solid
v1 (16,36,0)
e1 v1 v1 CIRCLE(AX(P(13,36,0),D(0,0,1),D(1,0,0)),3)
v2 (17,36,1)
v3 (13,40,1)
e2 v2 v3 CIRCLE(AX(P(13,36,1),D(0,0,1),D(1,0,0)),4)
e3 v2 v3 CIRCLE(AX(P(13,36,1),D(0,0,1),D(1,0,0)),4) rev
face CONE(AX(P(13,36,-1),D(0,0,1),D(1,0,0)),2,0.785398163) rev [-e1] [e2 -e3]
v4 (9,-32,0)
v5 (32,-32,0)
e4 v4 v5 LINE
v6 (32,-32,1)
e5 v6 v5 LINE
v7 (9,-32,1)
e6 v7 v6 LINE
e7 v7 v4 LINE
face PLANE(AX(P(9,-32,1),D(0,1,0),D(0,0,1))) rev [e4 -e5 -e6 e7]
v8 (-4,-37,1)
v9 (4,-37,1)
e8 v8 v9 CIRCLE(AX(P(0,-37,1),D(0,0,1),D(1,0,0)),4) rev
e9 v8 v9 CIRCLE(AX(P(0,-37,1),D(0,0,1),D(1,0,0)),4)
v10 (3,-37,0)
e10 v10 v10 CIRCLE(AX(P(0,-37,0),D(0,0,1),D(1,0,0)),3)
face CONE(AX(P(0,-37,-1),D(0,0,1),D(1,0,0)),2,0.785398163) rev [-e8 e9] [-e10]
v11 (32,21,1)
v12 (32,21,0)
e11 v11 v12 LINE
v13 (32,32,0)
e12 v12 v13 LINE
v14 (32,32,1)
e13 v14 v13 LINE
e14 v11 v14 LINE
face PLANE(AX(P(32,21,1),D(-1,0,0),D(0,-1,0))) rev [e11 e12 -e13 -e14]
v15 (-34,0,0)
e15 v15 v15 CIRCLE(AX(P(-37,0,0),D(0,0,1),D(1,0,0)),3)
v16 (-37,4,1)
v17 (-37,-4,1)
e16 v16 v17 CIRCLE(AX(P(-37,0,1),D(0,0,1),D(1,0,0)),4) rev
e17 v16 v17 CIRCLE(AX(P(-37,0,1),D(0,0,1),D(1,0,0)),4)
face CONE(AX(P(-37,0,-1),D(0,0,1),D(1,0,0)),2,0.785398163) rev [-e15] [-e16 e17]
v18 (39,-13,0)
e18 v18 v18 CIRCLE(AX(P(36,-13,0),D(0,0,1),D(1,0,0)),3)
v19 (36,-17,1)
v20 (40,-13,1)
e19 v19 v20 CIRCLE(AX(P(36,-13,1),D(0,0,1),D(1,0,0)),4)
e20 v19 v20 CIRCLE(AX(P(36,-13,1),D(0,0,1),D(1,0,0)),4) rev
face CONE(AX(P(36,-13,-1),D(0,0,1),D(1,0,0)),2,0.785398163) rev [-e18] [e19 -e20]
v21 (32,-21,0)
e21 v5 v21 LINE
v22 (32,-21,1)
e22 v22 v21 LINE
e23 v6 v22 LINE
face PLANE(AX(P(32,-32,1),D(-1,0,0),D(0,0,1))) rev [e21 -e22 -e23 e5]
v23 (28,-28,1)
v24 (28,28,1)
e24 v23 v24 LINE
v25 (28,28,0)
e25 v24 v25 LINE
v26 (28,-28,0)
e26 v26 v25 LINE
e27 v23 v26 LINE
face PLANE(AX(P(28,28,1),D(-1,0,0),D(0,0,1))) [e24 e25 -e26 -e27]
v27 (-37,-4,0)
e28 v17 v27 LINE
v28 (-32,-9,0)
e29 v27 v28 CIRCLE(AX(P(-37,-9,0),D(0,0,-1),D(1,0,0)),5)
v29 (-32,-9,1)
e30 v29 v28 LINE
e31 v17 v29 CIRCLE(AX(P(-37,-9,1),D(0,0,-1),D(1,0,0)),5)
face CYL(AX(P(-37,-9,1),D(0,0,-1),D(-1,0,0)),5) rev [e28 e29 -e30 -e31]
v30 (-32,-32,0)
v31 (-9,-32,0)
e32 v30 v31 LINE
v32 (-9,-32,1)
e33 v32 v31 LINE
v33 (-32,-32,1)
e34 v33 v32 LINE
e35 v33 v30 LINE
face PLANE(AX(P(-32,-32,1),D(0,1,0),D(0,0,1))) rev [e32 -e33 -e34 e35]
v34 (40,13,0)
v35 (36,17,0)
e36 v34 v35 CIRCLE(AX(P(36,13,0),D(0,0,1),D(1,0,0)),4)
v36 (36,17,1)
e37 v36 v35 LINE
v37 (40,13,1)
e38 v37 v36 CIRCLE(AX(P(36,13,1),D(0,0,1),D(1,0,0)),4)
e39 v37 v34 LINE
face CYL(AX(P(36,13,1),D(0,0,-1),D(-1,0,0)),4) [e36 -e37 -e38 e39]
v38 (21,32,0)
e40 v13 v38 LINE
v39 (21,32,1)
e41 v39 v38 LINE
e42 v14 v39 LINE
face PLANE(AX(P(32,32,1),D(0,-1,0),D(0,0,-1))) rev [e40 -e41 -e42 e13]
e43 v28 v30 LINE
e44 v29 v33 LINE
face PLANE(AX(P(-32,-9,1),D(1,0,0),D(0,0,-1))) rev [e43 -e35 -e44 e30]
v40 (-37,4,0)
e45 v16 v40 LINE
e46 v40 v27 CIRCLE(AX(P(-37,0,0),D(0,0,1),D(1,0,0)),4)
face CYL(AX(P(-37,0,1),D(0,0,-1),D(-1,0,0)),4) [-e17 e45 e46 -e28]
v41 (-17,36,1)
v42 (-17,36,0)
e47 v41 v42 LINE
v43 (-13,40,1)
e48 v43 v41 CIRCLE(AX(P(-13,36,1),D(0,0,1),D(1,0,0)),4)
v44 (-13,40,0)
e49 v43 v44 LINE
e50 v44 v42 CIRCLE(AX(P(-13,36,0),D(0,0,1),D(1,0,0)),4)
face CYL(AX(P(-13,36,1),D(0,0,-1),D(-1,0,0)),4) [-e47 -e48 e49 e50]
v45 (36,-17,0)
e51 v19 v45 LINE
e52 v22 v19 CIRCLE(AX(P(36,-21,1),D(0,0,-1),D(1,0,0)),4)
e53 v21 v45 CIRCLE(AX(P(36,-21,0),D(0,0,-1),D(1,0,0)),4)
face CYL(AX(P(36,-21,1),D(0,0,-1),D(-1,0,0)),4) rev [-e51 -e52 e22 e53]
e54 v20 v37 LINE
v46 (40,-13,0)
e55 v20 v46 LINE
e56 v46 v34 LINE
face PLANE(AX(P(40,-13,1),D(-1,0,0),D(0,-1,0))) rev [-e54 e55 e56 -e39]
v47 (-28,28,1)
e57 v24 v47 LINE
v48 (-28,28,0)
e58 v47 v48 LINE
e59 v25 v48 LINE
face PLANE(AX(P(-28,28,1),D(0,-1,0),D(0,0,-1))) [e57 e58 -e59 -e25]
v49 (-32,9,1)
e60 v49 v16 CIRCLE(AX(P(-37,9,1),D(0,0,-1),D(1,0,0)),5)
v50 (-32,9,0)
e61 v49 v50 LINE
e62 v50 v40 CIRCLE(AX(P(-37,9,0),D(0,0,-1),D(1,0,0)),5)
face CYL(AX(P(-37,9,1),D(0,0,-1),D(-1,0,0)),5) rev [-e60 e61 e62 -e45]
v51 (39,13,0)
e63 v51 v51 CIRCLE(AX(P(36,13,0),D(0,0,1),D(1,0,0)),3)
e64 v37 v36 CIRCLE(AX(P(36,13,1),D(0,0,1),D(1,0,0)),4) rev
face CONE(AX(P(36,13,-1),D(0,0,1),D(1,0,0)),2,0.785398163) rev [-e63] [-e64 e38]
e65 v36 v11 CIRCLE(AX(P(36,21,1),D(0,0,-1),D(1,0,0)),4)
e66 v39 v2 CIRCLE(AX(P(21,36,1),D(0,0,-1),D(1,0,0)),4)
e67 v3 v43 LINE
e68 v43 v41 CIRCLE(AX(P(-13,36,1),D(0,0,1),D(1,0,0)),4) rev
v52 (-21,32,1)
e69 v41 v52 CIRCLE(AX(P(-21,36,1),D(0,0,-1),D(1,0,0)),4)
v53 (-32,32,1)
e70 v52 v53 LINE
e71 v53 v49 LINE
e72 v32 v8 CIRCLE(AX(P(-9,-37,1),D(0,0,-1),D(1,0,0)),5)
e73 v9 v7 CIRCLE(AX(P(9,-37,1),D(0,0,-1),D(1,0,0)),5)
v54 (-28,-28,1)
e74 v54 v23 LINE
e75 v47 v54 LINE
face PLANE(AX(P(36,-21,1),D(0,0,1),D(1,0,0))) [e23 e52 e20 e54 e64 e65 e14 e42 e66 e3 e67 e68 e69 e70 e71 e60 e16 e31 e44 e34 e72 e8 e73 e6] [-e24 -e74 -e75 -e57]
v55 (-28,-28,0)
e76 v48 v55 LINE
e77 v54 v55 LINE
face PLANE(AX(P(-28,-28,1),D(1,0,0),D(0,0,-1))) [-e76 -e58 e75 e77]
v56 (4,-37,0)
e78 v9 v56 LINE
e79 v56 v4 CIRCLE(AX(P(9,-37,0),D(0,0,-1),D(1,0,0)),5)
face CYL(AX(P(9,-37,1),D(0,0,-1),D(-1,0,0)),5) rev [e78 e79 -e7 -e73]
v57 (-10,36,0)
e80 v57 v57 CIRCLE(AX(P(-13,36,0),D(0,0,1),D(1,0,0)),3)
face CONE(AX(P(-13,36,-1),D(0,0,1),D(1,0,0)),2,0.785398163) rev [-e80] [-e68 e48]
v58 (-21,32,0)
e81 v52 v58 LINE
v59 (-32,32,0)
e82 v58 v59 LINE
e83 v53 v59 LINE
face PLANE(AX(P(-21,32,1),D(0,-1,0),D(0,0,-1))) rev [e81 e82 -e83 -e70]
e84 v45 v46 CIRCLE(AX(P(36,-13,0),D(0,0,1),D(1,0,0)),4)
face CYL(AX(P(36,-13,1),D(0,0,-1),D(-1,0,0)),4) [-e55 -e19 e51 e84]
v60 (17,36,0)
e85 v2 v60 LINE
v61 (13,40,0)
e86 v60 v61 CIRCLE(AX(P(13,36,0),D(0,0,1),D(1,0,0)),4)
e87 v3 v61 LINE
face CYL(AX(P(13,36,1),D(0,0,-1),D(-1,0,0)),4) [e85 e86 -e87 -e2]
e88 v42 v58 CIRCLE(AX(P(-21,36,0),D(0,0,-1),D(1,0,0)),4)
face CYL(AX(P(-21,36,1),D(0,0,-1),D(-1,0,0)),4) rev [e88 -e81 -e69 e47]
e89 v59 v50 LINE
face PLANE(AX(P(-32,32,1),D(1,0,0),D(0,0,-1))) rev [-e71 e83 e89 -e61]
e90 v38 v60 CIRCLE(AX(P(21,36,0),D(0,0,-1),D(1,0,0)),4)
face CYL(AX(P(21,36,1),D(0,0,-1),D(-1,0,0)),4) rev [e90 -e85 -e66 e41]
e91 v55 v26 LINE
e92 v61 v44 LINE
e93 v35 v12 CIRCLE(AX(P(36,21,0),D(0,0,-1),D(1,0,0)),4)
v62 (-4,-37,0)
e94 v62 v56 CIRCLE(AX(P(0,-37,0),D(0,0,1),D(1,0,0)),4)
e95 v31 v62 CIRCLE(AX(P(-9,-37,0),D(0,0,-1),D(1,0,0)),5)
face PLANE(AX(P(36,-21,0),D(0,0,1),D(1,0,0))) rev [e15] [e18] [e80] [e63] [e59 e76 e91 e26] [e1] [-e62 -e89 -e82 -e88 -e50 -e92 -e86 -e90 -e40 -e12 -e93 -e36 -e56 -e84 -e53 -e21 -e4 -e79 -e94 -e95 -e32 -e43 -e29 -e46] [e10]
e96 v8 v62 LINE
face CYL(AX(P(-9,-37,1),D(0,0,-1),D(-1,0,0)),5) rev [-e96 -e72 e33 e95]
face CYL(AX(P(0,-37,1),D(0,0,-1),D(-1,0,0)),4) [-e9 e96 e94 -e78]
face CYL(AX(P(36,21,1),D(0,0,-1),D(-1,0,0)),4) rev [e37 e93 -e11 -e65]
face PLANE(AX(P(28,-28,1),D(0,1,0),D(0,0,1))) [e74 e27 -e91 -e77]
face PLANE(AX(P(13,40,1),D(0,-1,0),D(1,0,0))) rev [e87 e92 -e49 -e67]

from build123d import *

# Parameters (mm, degrees)
SKETCH1_R           = 2
SKETCH1_W           = 56
SKETCH1_H           = 56
BOSS_EXTRUDE1_DEPTH = 1
CHAMFER1_SIZE       = 2


with BuildPart() as part:
    # Sketch1 → Boss-Extrude1 (new body)
    with BuildSketch(Plane.XY):
        with BuildLine():
            Line((40, -13), (40, 13))
            ThreePointArc((40, 13), (38.828427125, 15.828427125), (36, 17))
            ThreePointArc((36, 17), (33.171572875, 18.171572875), (32, 21))
            Line((32, 21), (32, 32))
            Line((32, 32), (21, 32))
            ThreePointArc((21, 32), (18.171572875, 33.171572875), (17, 36))
            ThreePointArc((17, 36), (15.828427125, 38.828427125), (13, 40))
            Line((13, 40), (-13, 40))
            ThreePointArc((-13, 40), (-15.828427125, 38.828427125), (-17, 36))
            ThreePointArc((-17, 36), (-18.171572875, 33.171572875), (-21, 32))
            Line((-21, 32), (-32, 32))
            Line((-32, 32), (-32, 9))
            ThreePointArc((-32, 9), (-33.464466094, 5.464466094), (-37, 4))
            ThreePointArc((-37, 4), (-41, 0), (-37, -4))
            ThreePointArc((-37, -4), (-33.464466094, -5.464466094), (-32, -9))
            Line((-32, -9), (-32, -32))
            Line((-32, -32), (-9, -32))
            ThreePointArc((-9, -32), (-5.464466094, -33.464466094), (-4, -37))
            ThreePointArc((-4, -37), (0, -41), (4, -37))
            ThreePointArc((4, -37), (5.464466094, -33.464466094), (9, -32))
            Line((9, -32), (32, -32))
            Line((32, -32), (32, -21))
            ThreePointArc((32, -21), (33.171572875, -18.171572875), (36, -17))
            ThreePointArc((36, -17), (38.828427125, -15.828427125), (40, -13))
        make_face()
        with Locations((-37, 0)):
            Circle(SKETCH1_R, mode=Mode.SUBTRACT)
        with Locations((-13, 36)):
            Circle(SKETCH1_R, mode=Mode.SUBTRACT)
        with Locations((0, -37)):
            Circle(SKETCH1_R, mode=Mode.SUBTRACT)
        with Locations((36, -13)):
            Circle(SKETCH1_R, mode=Mode.SUBTRACT)
        with Locations((36, 13)):
            Circle(SKETCH1_R, mode=Mode.SUBTRACT)
        with Locations((13, 36)):
            Circle(SKETCH1_R, mode=Mode.SUBTRACT)
        Rectangle(SKETCH1_W, SKETCH1_H, mode=Mode.SUBTRACT)
    extrude(amount=BOSS_EXTRUDE1_DEPTH)

    # Chamfer1
    # the kernel refuses this chamfer: 2 mm, written as the material it takes off along each edge
    with BuildSketch(Plane(origin=(13, 36, 1), x_dir=(1, 0, 0), z_dir=(0, -1, 0))) as chamfer1_piece_1:
        Polygon((2, -CHAMFER1_SIZE), (2 + CHAMFER1_SIZE, 0), (2, 0), align=None)
    revolve(axis=Axis((13, 36, 1), (0, 0, 1)), mode=Mode.SUBTRACT)
    with BuildSketch(Plane(origin=(-13, 36, 1), x_dir=(1, 0, 0), z_dir=(0, -1, 0))) as chamfer1_piece_2:
        Polygon((2, -CHAMFER1_SIZE), (2 + CHAMFER1_SIZE, 0), (2, 0), align=None)
    revolve(axis=Axis((-13, 36, 1), (0, 0, 1)), mode=Mode.SUBTRACT)
    with BuildSketch(Plane(origin=(-37, 0, 1), x_dir=(1, 0, 0), z_dir=(0, -1, 0))) as chamfer1_piece_3:
        Polygon((2, -CHAMFER1_SIZE), (2 + CHAMFER1_SIZE, 0), (2, 0), align=None)
    revolve(axis=Axis((-37, 0, 1), (0, 0, 1)), mode=Mode.SUBTRACT)
    with BuildSketch(Plane(origin=(36, -13, 1), x_dir=(1, 0, 0), z_dir=(0, -1, 0))) as chamfer1_piece_4:
        Polygon((2, -CHAMFER1_SIZE), (2 + CHAMFER1_SIZE, 0), (2, 0), align=None)
    revolve(axis=Axis((36, -13, 1), (0, 0, 1)), mode=Mode.SUBTRACT)
    with BuildSketch(Plane(origin=(0, -37, 1), x_dir=(1, 0, 0), z_dir=(0, -1, 0))) as chamfer1_piece_5:
        Polygon((2, -CHAMFER1_SIZE), (2 + CHAMFER1_SIZE, 0), (2, 0), align=None)
    revolve(axis=Axis((0, -37, 1), (0, 0, 1)), mode=Mode.SUBTRACT)
    with BuildSketch(Plane(origin=(36, 13, 1), x_dir=(1, 0, 0), z_dir=(0, -1, 0))) as chamfer1_piece_6:
        Polygon((2, -CHAMFER1_SIZE), (2 + CHAMFER1_SIZE, 0), (2, 0), align=None)
    revolve(axis=Axis((36, 13, 1), (0, 0, 1)), mode=Mode.SUBTRACT)


solid = part.part
